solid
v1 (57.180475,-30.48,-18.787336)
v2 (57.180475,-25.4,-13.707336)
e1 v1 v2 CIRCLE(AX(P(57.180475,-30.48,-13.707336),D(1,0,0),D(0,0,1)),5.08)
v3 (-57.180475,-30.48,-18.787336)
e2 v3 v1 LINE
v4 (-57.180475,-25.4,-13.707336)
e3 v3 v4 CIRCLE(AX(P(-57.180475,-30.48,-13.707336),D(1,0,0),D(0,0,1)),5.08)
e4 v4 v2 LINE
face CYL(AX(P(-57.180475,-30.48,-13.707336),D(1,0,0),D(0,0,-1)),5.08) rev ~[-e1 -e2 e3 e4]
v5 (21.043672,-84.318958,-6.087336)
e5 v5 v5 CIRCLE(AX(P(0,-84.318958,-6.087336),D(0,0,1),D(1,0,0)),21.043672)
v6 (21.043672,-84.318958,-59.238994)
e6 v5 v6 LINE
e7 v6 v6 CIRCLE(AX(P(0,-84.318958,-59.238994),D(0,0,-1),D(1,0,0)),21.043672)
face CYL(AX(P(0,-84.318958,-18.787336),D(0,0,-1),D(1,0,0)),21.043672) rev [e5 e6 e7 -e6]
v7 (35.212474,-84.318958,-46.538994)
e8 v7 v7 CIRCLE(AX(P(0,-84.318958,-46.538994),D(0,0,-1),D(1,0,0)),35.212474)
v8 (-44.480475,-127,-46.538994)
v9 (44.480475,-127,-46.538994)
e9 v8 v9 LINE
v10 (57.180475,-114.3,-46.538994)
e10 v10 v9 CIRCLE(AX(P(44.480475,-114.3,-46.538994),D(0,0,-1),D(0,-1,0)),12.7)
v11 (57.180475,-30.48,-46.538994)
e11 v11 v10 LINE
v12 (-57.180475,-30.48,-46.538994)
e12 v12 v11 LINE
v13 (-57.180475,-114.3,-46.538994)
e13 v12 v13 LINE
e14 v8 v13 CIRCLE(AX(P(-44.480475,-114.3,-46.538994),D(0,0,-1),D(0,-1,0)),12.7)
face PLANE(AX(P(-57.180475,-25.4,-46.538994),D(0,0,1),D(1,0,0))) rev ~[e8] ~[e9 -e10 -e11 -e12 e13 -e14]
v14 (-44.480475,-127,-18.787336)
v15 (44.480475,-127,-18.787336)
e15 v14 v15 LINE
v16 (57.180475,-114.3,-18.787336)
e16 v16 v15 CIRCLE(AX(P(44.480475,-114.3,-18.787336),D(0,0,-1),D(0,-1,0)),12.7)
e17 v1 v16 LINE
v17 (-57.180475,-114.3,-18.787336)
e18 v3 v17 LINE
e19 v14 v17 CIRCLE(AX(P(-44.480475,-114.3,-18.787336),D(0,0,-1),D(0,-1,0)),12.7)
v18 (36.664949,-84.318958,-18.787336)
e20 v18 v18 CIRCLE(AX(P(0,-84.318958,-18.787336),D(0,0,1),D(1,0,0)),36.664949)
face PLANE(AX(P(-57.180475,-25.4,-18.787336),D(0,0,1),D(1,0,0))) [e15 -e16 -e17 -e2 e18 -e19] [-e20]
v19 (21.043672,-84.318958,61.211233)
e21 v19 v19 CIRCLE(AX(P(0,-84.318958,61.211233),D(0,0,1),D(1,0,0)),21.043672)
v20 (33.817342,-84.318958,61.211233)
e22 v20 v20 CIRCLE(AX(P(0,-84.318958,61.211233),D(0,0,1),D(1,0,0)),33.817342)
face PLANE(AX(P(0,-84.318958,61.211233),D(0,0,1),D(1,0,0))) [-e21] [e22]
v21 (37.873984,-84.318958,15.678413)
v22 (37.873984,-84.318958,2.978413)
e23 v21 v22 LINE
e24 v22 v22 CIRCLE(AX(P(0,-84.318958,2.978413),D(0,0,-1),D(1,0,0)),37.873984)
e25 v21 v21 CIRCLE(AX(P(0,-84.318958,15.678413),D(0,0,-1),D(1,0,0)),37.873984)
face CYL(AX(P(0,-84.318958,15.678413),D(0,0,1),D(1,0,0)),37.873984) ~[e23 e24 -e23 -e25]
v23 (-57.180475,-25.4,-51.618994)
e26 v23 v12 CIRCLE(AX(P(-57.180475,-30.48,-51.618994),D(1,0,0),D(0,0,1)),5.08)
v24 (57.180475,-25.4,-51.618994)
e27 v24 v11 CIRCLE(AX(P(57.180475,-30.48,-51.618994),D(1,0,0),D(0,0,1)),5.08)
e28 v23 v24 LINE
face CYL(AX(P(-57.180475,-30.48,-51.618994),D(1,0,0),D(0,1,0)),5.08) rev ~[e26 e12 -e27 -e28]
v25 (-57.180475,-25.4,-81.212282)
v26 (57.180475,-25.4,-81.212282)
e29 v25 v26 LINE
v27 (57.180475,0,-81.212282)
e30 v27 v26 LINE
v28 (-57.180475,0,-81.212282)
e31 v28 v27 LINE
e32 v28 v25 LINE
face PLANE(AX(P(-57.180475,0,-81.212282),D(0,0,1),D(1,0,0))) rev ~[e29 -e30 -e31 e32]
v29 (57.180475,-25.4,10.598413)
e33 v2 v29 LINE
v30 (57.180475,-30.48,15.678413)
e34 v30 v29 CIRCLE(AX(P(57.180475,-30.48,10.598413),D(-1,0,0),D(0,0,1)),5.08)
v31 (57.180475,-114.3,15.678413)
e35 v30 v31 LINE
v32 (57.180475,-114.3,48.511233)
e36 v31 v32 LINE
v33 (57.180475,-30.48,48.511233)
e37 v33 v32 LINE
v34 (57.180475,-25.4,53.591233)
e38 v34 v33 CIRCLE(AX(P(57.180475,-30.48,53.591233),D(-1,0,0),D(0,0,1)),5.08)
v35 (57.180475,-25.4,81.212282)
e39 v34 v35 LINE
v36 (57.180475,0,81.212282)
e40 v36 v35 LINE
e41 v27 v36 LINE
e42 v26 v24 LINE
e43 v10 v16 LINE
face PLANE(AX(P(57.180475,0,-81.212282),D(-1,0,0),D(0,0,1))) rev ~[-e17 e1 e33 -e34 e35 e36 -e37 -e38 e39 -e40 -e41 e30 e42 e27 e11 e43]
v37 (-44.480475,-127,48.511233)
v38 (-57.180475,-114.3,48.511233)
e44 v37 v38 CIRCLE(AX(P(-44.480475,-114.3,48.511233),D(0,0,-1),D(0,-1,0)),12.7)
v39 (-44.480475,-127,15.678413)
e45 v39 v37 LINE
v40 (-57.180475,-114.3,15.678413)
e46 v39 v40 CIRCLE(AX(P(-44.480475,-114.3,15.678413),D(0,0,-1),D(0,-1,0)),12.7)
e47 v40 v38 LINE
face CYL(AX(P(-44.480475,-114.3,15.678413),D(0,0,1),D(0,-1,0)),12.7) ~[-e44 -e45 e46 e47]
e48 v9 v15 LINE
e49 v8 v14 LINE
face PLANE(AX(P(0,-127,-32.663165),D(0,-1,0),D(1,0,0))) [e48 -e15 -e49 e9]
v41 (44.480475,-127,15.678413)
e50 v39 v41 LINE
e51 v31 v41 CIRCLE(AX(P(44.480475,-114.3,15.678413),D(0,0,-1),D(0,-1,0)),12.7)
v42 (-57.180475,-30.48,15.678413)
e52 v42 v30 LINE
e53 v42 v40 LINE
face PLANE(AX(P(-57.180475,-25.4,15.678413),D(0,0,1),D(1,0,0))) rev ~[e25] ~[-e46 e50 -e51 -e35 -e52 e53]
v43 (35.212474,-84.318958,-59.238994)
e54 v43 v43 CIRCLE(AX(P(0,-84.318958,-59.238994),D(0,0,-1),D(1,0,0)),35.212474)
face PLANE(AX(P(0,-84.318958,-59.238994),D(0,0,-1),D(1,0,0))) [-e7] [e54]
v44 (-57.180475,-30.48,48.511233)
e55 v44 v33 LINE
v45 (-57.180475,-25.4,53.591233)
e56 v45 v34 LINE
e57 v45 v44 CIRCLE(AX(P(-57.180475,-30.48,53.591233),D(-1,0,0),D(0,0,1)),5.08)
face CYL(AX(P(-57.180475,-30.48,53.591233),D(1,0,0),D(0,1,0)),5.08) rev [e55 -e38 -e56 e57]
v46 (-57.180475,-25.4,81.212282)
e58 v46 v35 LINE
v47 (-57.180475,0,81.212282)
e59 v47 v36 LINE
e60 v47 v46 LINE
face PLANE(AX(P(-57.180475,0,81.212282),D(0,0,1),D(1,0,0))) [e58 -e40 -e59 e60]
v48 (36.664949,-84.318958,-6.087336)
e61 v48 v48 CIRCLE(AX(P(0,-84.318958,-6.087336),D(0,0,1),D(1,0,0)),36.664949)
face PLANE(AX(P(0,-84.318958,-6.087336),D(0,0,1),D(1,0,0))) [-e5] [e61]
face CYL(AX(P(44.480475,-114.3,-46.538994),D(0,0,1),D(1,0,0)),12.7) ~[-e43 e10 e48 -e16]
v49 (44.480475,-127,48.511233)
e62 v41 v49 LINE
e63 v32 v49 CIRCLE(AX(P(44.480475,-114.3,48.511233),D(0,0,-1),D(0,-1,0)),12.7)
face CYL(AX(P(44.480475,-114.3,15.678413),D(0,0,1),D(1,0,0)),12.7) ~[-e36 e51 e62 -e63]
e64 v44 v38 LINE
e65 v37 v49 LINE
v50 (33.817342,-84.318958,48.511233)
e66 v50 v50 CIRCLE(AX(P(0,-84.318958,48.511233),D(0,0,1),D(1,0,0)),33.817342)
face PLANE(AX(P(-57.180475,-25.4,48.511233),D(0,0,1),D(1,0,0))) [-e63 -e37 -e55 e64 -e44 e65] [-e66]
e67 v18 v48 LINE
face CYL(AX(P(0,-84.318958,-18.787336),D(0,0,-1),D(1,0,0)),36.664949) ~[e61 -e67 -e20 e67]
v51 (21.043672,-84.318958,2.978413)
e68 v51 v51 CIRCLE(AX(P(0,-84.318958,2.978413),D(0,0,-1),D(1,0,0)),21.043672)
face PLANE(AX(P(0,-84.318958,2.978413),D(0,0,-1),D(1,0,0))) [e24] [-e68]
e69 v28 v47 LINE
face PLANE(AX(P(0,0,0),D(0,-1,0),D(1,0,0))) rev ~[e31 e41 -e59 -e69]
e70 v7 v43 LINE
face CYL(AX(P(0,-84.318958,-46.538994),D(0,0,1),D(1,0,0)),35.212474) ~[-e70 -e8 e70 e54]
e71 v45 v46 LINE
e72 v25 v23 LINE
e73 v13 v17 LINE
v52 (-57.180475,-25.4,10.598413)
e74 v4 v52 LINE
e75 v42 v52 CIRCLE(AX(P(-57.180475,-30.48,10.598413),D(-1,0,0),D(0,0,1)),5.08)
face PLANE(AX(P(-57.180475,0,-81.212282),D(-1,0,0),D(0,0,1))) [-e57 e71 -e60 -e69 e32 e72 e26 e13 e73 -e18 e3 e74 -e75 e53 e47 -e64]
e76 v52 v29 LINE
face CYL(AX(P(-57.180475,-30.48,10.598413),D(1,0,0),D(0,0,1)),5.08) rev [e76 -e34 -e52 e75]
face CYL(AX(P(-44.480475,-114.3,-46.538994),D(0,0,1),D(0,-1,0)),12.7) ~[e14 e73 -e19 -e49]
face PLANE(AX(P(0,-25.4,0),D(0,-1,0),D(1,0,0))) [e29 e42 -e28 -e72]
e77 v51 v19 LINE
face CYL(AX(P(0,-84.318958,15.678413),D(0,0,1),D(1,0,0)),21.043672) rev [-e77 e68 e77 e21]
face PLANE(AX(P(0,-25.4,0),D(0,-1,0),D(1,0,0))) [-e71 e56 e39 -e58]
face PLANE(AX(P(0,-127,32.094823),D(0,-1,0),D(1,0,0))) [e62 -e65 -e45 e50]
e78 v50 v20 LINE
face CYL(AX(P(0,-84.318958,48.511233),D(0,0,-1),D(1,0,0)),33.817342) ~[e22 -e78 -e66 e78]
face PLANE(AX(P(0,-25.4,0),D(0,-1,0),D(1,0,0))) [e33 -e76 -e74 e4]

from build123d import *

# Parameters (mm, degrees)
F0_W       = 114.3609508872
F0_H       = 162.4245643616
F1_DEPTH   = 25.4
F2_W       = 114.3609508872
F2_H       = 32.8328199685
F2_H_2     = 27.7516581118
F3_DEPTH   = 101.6
F4_R       = 21.0436715378
F3_FACE1_W = 114.3609508872
F3_FACE1_H = 101.6
F5_DEPTH   = 228.6
F6_R       = 33.8173420759
F6_R_2     = 21.0436715378
F10_DEPTH  = 12.7
F9_R       = 35.2124743409
F9_R_2     = 21.0436715378
F11_DEPTH  = 12.7
F12_R      = 5.08
F7_R       = 37.8739843542
F7_R_2     = 21.0436715378
F13_DEPTH  = 12.7
F8_R       = 36.6649491414
F8_R_2     = 21.0436715378
F14_DEPTH  = 12.7
F15_R      = 12.7


with BuildPart() as f1:
    # F0 (on Front) → F1 (new body)
    with BuildSketch(Plane.XZ):
        Rectangle(F0_W, F0_H)
    extrude(amount=F1_DEPTH)

    # F2 (on face) → F3 (join)
    with BuildSketch(Plane.XZ.offset(25.4)):
        with Locations((0, 32.0948231965)):
            Rectangle(F2_W, F2_H)
        with Locations((0, -32.6631646603)):
            Rectangle(F2_W, F2_H_2)
    extrude(amount=F3_DEPTH)

    # F4 (on face) + F3_face1 (on face) → F5 (cut)
    with BuildSketch(Plane.XY.offset(48.5112331808)):
        with Locations((0, -84.3189582229)):
            Circle(F4_R)
    with BuildSketch(Plane(origin=(0, -76.2, -46.5389937162), x_dir=(1, 0, 0), z_dir=(0, 0, -1))):
        Rectangle(F3_FACE1_W, F3_FACE1_H)
    extrude(amount=-F5_DEPTH, dir=(0, 0, 1), mode=Mode.SUBTRACT)

    # F6 (on face) → F10 (join)
    with BuildSketch(Plane.XY.offset(48.5112331808)):
        with Locations((0, -84.3189582229)):
            Circle(F6_R)
        with Locations((0, -84.3189582229)):
            Circle(F6_R_2, mode=Mode.SUBTRACT)
    extrude(amount=F10_DEPTH)

    # F9 (on face) → F11 (join)
    with BuildSketch(Plane(origin=(0, 0, -46.5389937162), x_dir=(1, 0, 0), z_dir=(0, 0, -1))):
        with Locations((0, 84.3189582229)):
            Circle(F9_R)
        with Locations((0, 84.3189582229)):
            Circle(F9_R_2, mode=Mode.SUBTRACT)
    extrude(amount=F11_DEPTH)

    # F12
    f12_edges = [f1.edges().sort_by_distance(p)[0] for p in [
        (0, -25.4, 48.511233),
        (0, -25.4, 15.678413),
        (0, -25.4, -18.787336),
        (0, -25.4, -46.538994),
    ]]
    fillet(f12_edges, radius=F12_R)

    # F7 (on face) → F13 (join)
    with BuildSketch(Plane(origin=(0, 0, 15.6784132123), x_dir=(1, 0, 0), z_dir=(0, 0, -1))):
        with Locations((0, 84.3189582229)):
            Circle(F7_R)
        with Locations((0, 84.3189582229)):
            Circle(F7_R_2, mode=Mode.SUBTRACT)
    extrude(amount=F13_DEPTH)

    # F8 (on face) → F14 (join)
    with BuildSketch(Plane.XY.offset(-18.7873356044)):
        with Locations((0, -84.3189582229)):
            Circle(F8_R)
        with Locations((0, -84.3189582229)):
            Circle(F8_R_2, mode=Mode.SUBTRACT)
    extrude(amount=F14_DEPTH)

    # F15
    f15_edges = [f1.edges().sort_by_distance(p)[0] for p in [
        (57.180475, -127, -32.663165),
        (57.180475, -127, 32.094823),
        (-57.180475, -127, -32.663165),
        (-57.180475, -127, 32.094823),
    ]]
    fillet(f15_edges, radius=F15_R)


solid = f1.part
